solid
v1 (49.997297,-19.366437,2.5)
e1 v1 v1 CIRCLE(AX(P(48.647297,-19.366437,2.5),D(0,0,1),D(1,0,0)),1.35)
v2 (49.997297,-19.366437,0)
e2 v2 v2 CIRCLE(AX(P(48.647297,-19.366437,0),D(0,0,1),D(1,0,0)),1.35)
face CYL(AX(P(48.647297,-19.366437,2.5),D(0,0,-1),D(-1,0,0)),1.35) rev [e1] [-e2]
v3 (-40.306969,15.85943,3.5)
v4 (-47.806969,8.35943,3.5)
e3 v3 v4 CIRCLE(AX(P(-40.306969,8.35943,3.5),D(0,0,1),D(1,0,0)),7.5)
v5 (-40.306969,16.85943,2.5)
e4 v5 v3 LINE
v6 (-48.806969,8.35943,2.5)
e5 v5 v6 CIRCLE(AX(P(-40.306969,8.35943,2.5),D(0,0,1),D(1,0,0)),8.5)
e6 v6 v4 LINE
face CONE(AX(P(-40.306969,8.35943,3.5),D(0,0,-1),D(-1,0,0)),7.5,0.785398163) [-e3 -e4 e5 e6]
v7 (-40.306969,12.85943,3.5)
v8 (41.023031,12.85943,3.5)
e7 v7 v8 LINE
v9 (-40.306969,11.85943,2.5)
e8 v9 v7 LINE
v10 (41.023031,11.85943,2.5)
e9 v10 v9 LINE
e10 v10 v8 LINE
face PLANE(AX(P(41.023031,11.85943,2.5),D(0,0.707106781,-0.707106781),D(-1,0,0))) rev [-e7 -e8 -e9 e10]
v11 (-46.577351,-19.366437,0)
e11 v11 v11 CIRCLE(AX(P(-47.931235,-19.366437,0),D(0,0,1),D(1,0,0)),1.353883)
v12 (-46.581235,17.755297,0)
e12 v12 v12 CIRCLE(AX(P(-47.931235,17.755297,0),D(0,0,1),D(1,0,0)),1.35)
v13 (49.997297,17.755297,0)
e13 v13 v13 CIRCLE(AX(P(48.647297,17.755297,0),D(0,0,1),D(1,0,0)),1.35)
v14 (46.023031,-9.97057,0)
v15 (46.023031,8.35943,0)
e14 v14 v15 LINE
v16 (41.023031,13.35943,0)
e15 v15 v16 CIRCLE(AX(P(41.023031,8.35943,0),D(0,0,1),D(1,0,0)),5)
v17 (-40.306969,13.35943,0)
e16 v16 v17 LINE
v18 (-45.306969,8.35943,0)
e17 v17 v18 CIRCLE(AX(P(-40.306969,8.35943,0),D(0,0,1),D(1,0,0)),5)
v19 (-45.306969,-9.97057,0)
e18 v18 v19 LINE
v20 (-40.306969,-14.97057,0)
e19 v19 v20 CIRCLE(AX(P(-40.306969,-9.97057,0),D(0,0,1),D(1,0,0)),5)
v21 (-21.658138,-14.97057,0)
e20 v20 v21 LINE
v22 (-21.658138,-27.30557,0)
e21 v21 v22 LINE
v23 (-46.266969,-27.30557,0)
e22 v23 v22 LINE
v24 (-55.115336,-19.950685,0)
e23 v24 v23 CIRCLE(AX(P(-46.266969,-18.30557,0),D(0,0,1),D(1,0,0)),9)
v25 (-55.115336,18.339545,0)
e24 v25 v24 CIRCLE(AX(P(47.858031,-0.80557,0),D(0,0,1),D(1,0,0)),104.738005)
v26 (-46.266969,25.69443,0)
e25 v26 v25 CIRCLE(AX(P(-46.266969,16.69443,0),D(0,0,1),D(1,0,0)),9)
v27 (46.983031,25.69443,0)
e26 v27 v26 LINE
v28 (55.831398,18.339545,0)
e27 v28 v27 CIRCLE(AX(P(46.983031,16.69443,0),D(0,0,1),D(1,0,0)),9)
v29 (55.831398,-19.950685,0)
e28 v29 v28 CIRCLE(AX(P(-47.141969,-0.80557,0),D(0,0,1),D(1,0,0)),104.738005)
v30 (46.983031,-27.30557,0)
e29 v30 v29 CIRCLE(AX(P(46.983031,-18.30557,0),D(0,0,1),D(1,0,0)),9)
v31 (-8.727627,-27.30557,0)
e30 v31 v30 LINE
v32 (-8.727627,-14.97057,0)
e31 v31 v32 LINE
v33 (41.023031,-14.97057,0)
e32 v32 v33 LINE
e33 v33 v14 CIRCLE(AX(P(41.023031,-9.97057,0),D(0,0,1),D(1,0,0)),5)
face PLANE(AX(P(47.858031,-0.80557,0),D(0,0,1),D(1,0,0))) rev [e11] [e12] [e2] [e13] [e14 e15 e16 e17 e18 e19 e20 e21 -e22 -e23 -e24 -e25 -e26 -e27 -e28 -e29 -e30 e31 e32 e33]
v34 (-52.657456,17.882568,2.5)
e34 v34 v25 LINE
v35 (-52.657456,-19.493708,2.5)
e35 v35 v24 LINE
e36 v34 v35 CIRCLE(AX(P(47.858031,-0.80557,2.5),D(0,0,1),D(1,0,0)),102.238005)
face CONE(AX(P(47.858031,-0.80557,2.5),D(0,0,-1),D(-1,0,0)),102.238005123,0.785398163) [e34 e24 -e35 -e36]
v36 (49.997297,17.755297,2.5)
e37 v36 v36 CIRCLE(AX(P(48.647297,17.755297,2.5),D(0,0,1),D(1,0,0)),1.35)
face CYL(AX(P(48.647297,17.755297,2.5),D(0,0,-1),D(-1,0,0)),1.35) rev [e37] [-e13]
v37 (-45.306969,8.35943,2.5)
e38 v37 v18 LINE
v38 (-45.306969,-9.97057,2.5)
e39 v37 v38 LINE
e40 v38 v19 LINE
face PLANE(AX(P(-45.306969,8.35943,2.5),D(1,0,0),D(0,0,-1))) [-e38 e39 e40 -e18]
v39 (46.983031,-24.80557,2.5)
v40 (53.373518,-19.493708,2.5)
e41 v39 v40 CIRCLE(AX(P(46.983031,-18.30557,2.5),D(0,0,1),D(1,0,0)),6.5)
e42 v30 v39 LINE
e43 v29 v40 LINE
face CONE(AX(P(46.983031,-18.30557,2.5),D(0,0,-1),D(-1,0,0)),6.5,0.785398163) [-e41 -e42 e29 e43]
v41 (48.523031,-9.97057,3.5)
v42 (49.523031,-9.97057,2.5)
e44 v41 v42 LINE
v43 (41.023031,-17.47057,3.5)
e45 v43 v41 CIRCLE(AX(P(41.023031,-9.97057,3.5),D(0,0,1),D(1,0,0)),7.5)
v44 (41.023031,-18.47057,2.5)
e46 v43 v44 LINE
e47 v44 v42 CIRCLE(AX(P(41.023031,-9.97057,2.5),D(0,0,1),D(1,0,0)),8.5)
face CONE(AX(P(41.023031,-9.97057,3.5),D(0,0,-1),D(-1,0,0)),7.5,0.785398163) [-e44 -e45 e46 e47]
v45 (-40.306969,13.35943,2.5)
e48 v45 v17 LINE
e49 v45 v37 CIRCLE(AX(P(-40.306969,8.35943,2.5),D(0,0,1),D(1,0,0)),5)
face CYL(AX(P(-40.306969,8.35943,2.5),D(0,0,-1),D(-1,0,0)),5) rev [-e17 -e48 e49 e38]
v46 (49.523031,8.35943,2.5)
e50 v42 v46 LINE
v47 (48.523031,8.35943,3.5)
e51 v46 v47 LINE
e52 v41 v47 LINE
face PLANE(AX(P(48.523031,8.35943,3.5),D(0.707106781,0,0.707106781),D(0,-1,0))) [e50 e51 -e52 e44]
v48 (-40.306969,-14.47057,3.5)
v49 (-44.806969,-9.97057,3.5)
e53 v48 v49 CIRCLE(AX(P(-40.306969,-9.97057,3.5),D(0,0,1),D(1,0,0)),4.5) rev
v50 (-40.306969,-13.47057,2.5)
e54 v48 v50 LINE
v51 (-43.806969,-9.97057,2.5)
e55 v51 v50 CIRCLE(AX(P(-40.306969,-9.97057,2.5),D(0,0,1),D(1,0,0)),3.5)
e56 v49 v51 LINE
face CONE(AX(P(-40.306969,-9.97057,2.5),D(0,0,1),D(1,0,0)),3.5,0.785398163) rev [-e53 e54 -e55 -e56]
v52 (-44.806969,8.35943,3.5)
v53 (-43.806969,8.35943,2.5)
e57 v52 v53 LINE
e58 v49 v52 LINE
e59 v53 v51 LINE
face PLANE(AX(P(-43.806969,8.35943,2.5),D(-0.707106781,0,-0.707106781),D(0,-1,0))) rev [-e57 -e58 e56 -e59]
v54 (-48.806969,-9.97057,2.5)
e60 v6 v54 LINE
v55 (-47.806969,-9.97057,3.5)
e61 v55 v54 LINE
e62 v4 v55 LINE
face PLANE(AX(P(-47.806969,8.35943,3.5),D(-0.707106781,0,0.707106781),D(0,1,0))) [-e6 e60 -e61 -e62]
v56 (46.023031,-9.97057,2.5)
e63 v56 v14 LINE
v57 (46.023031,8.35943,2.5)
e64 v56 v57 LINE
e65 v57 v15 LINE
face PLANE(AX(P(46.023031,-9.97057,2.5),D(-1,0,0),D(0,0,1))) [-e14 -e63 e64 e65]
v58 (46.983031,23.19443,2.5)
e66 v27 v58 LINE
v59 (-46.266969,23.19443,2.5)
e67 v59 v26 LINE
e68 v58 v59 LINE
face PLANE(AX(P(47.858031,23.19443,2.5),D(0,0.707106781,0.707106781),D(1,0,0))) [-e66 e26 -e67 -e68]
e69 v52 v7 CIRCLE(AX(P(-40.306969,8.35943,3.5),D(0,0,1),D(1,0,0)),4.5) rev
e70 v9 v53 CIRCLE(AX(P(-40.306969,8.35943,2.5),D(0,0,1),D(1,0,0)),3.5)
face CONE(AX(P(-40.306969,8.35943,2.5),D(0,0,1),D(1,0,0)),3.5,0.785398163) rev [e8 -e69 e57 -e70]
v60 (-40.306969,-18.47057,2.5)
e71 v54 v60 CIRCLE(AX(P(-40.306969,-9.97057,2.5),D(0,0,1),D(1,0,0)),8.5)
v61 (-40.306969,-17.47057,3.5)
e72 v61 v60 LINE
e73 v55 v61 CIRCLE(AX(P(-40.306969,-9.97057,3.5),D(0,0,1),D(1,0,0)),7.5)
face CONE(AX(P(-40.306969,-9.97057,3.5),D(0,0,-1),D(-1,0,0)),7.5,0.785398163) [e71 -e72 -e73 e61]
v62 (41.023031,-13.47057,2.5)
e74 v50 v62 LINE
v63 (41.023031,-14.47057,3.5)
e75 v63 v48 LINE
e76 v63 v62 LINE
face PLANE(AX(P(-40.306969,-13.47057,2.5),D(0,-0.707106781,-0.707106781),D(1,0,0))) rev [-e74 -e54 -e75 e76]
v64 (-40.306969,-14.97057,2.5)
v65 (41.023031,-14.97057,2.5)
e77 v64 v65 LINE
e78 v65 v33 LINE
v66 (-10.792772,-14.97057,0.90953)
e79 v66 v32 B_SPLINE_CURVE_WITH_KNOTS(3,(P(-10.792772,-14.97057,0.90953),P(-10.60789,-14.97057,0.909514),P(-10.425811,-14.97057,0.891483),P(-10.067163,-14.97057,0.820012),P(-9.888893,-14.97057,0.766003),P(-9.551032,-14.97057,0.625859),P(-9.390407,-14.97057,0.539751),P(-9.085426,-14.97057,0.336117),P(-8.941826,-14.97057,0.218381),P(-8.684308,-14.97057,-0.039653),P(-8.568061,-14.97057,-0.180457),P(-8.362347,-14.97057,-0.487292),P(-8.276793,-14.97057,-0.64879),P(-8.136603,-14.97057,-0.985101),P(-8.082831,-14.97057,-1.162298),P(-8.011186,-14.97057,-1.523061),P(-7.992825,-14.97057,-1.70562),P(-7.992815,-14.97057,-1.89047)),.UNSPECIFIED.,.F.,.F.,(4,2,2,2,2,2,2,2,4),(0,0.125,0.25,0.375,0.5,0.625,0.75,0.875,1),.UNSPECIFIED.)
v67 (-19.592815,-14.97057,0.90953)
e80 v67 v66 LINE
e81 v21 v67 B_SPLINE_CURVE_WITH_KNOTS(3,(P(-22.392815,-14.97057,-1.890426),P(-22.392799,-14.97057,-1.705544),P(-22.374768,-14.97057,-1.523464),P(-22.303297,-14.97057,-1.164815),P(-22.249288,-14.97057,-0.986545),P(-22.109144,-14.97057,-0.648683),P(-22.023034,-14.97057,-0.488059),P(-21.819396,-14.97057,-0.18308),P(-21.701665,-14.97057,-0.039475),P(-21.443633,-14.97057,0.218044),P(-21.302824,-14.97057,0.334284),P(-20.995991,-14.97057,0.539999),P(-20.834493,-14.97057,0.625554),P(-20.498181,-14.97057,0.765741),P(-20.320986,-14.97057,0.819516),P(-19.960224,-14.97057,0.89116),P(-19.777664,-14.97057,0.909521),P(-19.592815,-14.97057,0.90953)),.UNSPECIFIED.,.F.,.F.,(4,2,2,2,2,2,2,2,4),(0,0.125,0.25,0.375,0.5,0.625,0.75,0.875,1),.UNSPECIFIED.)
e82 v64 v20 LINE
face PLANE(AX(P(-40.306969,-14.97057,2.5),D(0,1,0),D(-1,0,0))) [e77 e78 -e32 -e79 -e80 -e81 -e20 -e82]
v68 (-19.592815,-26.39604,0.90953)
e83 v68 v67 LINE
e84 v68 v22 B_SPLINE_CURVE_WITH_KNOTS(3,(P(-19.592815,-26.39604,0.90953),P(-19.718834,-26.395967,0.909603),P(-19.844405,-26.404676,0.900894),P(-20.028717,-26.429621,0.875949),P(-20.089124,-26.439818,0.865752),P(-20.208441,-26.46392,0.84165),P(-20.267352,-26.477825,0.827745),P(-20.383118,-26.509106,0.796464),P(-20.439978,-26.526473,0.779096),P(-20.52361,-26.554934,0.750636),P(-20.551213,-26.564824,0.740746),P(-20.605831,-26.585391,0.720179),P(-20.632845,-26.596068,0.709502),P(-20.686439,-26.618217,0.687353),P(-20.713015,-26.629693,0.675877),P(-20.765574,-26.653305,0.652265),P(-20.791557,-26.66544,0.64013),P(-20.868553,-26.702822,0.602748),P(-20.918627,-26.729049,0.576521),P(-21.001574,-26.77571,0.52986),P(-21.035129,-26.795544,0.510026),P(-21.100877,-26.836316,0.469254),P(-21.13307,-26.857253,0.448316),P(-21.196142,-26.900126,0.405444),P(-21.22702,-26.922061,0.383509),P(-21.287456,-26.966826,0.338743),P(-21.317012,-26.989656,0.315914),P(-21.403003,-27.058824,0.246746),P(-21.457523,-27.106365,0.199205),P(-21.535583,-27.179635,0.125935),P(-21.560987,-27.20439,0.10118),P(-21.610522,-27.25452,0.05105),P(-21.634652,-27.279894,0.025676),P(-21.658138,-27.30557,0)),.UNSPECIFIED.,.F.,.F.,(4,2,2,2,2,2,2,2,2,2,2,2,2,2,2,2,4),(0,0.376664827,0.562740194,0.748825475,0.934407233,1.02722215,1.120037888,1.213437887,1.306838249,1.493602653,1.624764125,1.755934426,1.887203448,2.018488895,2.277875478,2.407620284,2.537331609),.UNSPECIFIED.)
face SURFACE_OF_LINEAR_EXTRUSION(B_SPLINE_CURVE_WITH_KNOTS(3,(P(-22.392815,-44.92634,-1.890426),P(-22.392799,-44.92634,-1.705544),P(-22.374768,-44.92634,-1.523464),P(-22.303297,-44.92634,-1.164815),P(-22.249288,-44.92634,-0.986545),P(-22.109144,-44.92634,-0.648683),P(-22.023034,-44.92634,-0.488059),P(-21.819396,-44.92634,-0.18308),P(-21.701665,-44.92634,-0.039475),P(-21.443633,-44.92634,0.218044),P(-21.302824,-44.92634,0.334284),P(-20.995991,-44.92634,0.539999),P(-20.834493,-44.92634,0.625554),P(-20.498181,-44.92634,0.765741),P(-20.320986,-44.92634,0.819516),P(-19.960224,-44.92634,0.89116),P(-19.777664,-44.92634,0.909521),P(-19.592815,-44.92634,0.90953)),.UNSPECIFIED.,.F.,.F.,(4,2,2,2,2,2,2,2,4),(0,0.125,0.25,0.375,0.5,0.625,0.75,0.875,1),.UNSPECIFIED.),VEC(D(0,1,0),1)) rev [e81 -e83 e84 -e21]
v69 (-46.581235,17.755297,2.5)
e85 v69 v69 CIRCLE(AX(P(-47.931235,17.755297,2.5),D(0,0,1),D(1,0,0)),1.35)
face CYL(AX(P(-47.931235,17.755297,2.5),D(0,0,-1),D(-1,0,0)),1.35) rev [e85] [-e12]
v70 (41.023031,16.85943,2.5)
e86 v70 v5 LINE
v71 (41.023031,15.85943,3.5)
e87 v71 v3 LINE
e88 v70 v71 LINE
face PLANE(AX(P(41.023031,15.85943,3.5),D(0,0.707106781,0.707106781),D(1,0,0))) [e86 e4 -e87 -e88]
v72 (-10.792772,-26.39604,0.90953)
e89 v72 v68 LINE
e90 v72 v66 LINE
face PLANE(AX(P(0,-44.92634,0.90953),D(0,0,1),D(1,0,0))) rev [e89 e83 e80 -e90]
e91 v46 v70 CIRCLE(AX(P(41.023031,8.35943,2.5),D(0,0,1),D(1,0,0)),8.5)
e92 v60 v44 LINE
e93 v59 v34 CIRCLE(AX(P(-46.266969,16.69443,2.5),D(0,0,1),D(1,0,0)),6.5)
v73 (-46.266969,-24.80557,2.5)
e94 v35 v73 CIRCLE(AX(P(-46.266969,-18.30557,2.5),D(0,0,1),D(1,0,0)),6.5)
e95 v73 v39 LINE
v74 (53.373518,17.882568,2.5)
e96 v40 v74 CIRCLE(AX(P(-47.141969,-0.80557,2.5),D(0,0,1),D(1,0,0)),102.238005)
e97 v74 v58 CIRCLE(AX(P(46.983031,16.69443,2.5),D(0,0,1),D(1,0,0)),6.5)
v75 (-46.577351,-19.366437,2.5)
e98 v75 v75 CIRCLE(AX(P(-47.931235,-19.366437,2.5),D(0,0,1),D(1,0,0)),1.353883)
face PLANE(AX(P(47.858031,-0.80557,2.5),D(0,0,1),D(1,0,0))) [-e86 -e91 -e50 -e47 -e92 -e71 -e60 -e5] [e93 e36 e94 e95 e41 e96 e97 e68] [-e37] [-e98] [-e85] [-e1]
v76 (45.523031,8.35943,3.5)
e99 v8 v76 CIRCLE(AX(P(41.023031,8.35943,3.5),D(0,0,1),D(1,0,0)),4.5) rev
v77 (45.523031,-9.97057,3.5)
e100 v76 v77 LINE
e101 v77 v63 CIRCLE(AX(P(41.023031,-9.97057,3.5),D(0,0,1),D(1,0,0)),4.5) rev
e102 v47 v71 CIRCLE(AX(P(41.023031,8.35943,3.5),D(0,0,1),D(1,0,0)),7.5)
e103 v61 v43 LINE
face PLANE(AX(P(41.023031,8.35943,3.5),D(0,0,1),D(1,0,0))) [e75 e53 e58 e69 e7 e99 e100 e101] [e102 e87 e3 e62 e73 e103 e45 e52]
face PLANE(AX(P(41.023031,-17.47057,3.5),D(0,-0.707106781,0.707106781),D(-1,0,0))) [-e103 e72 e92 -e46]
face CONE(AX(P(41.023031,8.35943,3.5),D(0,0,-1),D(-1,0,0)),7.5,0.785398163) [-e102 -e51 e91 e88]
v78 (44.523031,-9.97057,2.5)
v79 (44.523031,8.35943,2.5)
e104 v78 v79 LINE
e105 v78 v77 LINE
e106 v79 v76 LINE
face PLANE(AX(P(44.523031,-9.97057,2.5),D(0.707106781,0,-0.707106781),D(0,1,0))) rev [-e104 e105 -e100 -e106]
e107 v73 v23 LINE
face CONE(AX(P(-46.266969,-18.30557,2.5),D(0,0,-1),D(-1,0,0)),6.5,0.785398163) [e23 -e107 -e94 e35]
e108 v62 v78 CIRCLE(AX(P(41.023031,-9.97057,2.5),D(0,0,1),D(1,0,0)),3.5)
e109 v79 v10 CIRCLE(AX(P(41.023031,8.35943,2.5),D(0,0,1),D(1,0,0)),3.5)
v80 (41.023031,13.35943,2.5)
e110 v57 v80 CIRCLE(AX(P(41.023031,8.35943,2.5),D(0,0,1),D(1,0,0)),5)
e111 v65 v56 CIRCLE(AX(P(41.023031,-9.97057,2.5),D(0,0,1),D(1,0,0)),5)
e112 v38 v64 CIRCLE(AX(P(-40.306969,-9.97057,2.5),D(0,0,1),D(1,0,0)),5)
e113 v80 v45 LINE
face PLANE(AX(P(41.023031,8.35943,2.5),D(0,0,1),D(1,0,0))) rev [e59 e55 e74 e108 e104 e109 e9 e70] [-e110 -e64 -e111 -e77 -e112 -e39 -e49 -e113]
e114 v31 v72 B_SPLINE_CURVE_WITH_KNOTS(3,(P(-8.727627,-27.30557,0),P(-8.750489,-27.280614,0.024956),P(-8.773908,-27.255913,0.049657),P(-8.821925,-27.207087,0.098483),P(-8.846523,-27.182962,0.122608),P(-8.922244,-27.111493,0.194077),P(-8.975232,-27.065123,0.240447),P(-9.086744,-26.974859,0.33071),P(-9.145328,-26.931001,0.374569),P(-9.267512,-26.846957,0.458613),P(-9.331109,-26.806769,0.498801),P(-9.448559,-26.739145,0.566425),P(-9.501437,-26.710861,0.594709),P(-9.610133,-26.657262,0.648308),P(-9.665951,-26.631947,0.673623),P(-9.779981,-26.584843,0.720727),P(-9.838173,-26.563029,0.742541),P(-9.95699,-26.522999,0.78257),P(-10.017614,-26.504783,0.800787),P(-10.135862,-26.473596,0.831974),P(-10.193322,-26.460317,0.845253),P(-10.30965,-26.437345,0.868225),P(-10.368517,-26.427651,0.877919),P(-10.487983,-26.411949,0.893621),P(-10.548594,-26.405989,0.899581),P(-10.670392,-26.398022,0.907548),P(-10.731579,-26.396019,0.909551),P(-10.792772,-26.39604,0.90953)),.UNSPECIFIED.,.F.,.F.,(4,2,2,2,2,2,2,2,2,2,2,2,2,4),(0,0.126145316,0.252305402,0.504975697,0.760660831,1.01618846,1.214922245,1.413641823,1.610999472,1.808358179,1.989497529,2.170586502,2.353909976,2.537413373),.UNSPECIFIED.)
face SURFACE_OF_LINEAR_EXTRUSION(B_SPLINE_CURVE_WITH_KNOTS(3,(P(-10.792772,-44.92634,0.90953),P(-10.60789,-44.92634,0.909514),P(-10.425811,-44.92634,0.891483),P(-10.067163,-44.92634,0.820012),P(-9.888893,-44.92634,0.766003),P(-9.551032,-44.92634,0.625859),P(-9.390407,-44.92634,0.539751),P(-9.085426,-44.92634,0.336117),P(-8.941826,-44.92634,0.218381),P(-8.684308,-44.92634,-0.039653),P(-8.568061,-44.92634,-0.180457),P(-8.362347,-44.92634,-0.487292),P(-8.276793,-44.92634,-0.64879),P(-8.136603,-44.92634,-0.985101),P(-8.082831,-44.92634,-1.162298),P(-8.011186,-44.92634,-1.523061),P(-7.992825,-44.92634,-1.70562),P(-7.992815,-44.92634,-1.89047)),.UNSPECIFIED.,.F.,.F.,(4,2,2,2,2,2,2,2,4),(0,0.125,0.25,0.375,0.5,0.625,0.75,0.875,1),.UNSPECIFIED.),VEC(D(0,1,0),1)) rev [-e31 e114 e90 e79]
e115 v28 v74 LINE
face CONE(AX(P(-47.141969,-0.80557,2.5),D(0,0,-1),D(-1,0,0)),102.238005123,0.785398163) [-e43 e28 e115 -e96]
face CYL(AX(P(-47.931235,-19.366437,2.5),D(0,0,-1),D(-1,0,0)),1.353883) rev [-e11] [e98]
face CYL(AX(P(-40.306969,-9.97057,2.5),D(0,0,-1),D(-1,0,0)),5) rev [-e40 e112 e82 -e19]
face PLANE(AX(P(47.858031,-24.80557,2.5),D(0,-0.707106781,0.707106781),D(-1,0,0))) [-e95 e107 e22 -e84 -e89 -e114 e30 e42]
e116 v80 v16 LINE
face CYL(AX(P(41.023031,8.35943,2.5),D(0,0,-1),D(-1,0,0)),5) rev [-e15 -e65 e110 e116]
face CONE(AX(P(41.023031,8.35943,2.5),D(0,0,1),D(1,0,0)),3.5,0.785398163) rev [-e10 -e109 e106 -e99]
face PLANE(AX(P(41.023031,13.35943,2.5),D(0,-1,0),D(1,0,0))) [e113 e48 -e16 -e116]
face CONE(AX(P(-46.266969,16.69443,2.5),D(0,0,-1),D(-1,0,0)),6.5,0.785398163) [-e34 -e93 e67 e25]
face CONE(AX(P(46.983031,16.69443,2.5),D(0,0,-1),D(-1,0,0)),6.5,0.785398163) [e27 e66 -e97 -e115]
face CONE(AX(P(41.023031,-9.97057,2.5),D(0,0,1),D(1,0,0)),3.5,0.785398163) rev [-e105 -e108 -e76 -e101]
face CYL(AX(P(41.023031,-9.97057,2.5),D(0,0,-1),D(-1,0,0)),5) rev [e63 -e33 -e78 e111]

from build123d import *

# Parameters (mm, degrees)
SKETCH1_R           = 1.35
SKETCH1_R_2         = 1.353883359
BOSS_EXTRUDE1_DEPTH = 2.5
BOSS_EXTRUDE2_DEPTH = 1
CHAMFER1_SIZE       = 1
CHAMFER2_SIZE       = 2.5
CUT_EXTRUDE1_REACH  = 65.837


with BuildPart() as part:
    # Sketch1 → Boss-Extrude1 (new body)
    with BuildSketch(Plane.XY):
        with BuildLine():
            Line((-46.266968928, -27.305569911), (46.983031072, -27.305569911))
            ThreePointArc((46.983031072, -27.305569911), (52.736028884, -25.226770397), (55.831398017, -19.950684615))
            ThreePointArc((55.831398017, -19.950684615), (57.596036195, -0.805569911), (55.831398017, 18.339544793))
            ThreePointArc((55.831398017, 18.339544793), (52.736028884, 23.615630575), (46.983031072, 25.694430089))
            Line((46.983031072, 25.694430089), (-46.266968928, 25.694430089))
            ThreePointArc((-46.266968928, 25.694430089), (-52.019966741, 23.615630575), (-55.115335874, 18.339544793))
            ThreePointArc((-55.115335874, 18.339544793), (-56.879974052, -0.805569911), (-55.115335874, -19.950684615))
            ThreePointArc((-55.115335874, -19.950684615), (-52.019966741, -25.226770397), (-46.266968928, -27.305569911))
        make_face()
        with Locations((48.647296931, -19.366437107)):
            Circle(SKETCH1_R, mode=Mode.SUBTRACT)
        with Locations((48.647296931, 17.755297285)):
            Circle(SKETCH1_R, mode=Mode.SUBTRACT)
        with Locations((-47.931234788, 17.755297285)):
            Circle(SKETCH1_R, mode=Mode.SUBTRACT)
        with Locations((-47.931234788, -19.366437107)):
            Circle(SKETCH1_R_2, mode=Mode.SUBTRACT)
        with BuildLine():
            Line((-40.306968928, -14.970569911), (41.023031072, -14.970569911))
            ThreePointArc((41.023031072, -14.970569911), (44.558564977, -13.506103817), (46.023031072, -9.970569911))
            Line((46.023031072, -9.970569911), (46.023031072, 8.359430089))
            ThreePointArc((46.023031072, 8.359430089), (44.558564977, 11.894963995), (41.023031072, 13.359430089))
            Line((41.023031072, 13.359430089), (-40.306968928, 13.359430089))
            ThreePointArc((-40.306968928, 13.359430089), (-43.842502834, 11.894963995), (-45.306968928, 8.359430089))
            Line((-45.306968928, 8.359430089), (-45.306968928, -9.970569911))
            ThreePointArc((-45.306968928, -9.970569911), (-43.842502834, -13.506103817), (-40.306968928, -14.970569911))
        make_face(mode=Mode.SUBTRACT)
    extrude(amount=BOSS_EXTRUDE1_DEPTH)

    # Sketch2 → Boss-Extrude2 (add)
    with BuildSketch(Plane.XY.offset(2.5)):
        with BuildLine():
            Line((49.523031072, -9.970569911), (49.523031072, 8.359430089))
            ThreePointArc((49.523031072, 8.359430089), (47.033438712, 14.369837729), (41.023031072, 16.859430089))
            Line((41.023031072, 16.859430089), (-40.306968928, 16.859430089))
            ThreePointArc((-40.306968928, 16.859430089), (-46.317376569, 14.369837729), (-48.806968928, 8.359430089))
            Line((-48.806968928, 8.359430089), (-48.806968928, -9.970569911))
            ThreePointArc((-48.806968928, -9.970569911), (-46.317376569, -15.980977551), (-40.306968928, -18.470569911))
            Line((-40.306968928, -18.470569911), (41.023031072, -18.470569911))
            ThreePointArc((41.023031072, -18.470569911), (47.033438712, -15.980977551), (49.523031072, -9.970569911))
        make_face()
        with BuildLine():
            Line((41.023031072, 11.859430089), (-40.306968928, 11.859430089))
            ThreePointArc((-40.306968928, 11.859430089), (-42.781842663, 10.834303823), (-43.806968928, 8.359430089))
            Line((-43.806968928, 8.359430089), (-43.806968928, -9.970569911))
            ThreePointArc((-43.806968928, -9.970569911), (-42.781842663, -12.445443645), (-40.306968928, -13.470569911))
            Line((-40.306968928, -13.470569911), (41.023031072, -13.470569911))
            ThreePointArc((41.023031072, -13.470569911), (43.497904806, -12.445443645), (44.523031072, -9.970569911))
            Line((44.523031072, -9.970569911), (44.523031072, 8.359430089))
            ThreePointArc((44.523031072, 8.359430089), (43.497904806, 10.834303823), (41.023031072, 11.859430089))
        make_face(mode=Mode.SUBTRACT)
    extrude(amount=BOSS_EXTRUDE2_DEPTH)

    # Chamfer1
    chamfer1_edges = [part.edges().sort_by_distance(p)[0] for p in [
        (-42.781842663, 10.834303823, 3.5),
        (-43.806968928, -0.805569911, 3.5),
        (-42.781842663, -12.445443645, 3.5),
        (0.358031072, -13.470569911, 3.5),
        (43.497904806, -12.445443645, 3.5),
        (44.523031072, -0.805569911, 3.5),
        (43.497904806, 10.834303823, 3.5),
        (0.358031072, 11.859430089, 3.5),
        (49.523031072, -0.805569911, 3.5),
        (47.033438712, -15.980977551, 3.5),
        (0.358031072, -18.470569911, 3.5),
        (-46.317376569, -15.980977551, 3.5),
        (-48.806968928, -0.805569911, 3.5),
        (-46.317376569, 14.369837729, 3.5),
        (0.358031072, 16.859430089, 3.5),
        (47.033438712, 14.369837729, 3.5),
    ]]
    chamfer(chamfer1_edges, length=CHAMFER1_SIZE - 0.0001)  # a hair under: the kernel refuses the full size

    # Chamfer2
    chamfer2_edges = [part.edges().sort_by_distance(p)[0] for p in [
        (0.358031072, -27.305569911, 2.5),
        (52.736028884, -25.226770397, 2.5),
        (-52.019966741, -25.226770397, 2.5),
        (57.596036195, -0.805569911, 2.5),
        (-56.879974052, -0.805569911, 2.5),
        (52.736028884, 23.615630575, 2.5),
        (-52.019966741, 23.615630575, 2.5),
        (0.358031072, 25.694430089, 2.5),
    ]]
    chamfer(chamfer2_edges, length=CHAMFER2_SIZE - 0.0001)  # a hair under: the kernel refuses the full size

    # Sketch5 → Cut-Extrude1 (cut, up to next)
    with BuildSketch(Plane(origin=(0, 0, 0), x_dir=(1, 0, 0), z_dir=(0, 1, 0)), mode=Mode.PRIVATE) as cut_extrude1_sk1:
        with BuildLine():
            Line((-19.592815412, -0.909530151), (-10.792772138, -0.909530149))
            add(Edge.make_bspline(
                [(-10.792772138, -0.909530149), (-10.607889911, -0.909514148), (-10.425811047, -0.891482678), (-10.067163044, -0.820012158), (-9.888892808, -0.766003184), (-9.551032167, -0.625859061), (-9.390406566, -0.539750951), (-9.085426061, -0.336116729), (-8.94182552, -0.218381132), (-8.684308041, 0.03965313), (-8.5680613, 0.180457001), (-8.362346878, 0.487291556), (-8.276792708, 0.648789775), (-8.136603309, 0.98510143), (-8.08283068, 1.162298316), (-8.011186114, 1.523060599), (-7.992824871, 1.70562035), (-7.992815412, 1.890469849)],
                knots=[0, 0, 0, 0, 0.125, 0.125, 0.25, 0.25, 0.375, 0.375, 0.5, 0.5, 0.625, 0.625, 0.75, 0.75, 0.875, 0.875, 1, 1, 1, 1], degree=3))
            Line((-7.992815412, 1.890469849), (-7.992815414, 4.590513396))
            add(Edge.make_bspline(
                [(-7.992815414, 4.590513396), (-7.992831516, 4.77539614), (-8.010862926, 4.957475483), (-8.082333794, 5.316124243), (-8.136342538, 5.494395104), (-8.276486434, 5.832256678), (-8.36259727, 5.992880987), (-8.566235233, 6.297859231), (-8.683965434, 6.441464903), (-8.94199783, 6.698983866), (-9.082807296, 6.815224132), (-9.389639852, 7.020938991), (-9.551138299, 7.106493896), (-9.887450056, 7.246680754), (-10.064645109, 7.300455528), (-10.425407019, 7.372099354), (-10.607966433, 7.390460335), (-10.792815412, 7.39046985)],
                knots=[0, 0, 0, 0, 0.125, 0.125, 0.25, 0.25, 0.375, 0.375, 0.5, 0.5, 0.625, 0.625, 0.75, 0.75, 0.875, 0.875, 1, 1, 1, 1], degree=3))
            Line((-10.792815412, 7.39046985), (-19.592859134, 7.390469847))
            add(Edge.make_bspline(
                [(-19.592859134, 7.390469847), (-19.777741324, 7.39045368), (-19.95982018, 7.372422237), (-20.318468162, 7.300951771), (-20.496738382, 7.246942784), (-20.834598951, 7.106798619), (-20.995224508, 7.020690495), (-21.300204927, 6.817056293), (-21.443805472, 6.699320682), (-21.701322913, 6.441286422), (-21.817569624, 6.300482564), (-22.023283979, 5.993648079), (-22.108838169, 5.832149812), (-22.249027542, 5.495838191), (-22.302800153, 5.318641354), (-22.374444712, 4.957879073), (-22.392805954, 4.775319331), (-22.392815413, 4.590469849)],
                knots=[0, 0, 0, 0, 0.125, 0.125, 0.25, 0.25, 0.375, 0.375, 0.5, 0.5, 0.625, 0.625, 0.75, 0.75, 0.875, 0.875, 1, 1, 1, 1], degree=3))
            Line((-22.392815413, 4.590469849), (-22.39281541, 1.890426302))
            add(Edge.make_bspline(
                [(-22.39281541, 1.890426302), (-22.392799308, 1.705543556), (-22.374767902, 1.523464217), (-22.303297034, 1.164815473), (-22.249288291, 0.986544615), (-22.109144391, 0.648683022), (-22.023033556, 0.488058712), (-21.819395604, 0.183080482), (-21.701665392, 0.039474796), (-21.443632989, -0.218044171), (-21.302823525, -0.334284433), (-20.995990998, -0.539999282), (-20.834492517, -0.625554209), (-20.498180754, -0.765741045), (-20.320985718, -0.819515805), (-19.960223809, -0.89115971), (-19.777664402, -0.909520761), (-19.592815412, -0.909530151)],
                knots=[0, 0, 0, 0, 0.125, 0.125, 0.25, 0.25, 0.375, 0.375, 0.5, 0.5, 0.625, 0.625, 0.75, 0.75, 0.875, 0.875, 1, 1, 1, 1], degree=3))
        make_face()
    cut_extrude1_tool1 = extrude(cut_extrude1_sk1.sketch, amount=-CUT_EXTRUDE1_REACH, mode=Mode.PRIVATE) & part.part
    add(cut_extrude1_tool1.solids().sort_by_distance((-15.192815, 0, -3.240461))[0], mode=Mode.SUBTRACT)


solid = part.part
